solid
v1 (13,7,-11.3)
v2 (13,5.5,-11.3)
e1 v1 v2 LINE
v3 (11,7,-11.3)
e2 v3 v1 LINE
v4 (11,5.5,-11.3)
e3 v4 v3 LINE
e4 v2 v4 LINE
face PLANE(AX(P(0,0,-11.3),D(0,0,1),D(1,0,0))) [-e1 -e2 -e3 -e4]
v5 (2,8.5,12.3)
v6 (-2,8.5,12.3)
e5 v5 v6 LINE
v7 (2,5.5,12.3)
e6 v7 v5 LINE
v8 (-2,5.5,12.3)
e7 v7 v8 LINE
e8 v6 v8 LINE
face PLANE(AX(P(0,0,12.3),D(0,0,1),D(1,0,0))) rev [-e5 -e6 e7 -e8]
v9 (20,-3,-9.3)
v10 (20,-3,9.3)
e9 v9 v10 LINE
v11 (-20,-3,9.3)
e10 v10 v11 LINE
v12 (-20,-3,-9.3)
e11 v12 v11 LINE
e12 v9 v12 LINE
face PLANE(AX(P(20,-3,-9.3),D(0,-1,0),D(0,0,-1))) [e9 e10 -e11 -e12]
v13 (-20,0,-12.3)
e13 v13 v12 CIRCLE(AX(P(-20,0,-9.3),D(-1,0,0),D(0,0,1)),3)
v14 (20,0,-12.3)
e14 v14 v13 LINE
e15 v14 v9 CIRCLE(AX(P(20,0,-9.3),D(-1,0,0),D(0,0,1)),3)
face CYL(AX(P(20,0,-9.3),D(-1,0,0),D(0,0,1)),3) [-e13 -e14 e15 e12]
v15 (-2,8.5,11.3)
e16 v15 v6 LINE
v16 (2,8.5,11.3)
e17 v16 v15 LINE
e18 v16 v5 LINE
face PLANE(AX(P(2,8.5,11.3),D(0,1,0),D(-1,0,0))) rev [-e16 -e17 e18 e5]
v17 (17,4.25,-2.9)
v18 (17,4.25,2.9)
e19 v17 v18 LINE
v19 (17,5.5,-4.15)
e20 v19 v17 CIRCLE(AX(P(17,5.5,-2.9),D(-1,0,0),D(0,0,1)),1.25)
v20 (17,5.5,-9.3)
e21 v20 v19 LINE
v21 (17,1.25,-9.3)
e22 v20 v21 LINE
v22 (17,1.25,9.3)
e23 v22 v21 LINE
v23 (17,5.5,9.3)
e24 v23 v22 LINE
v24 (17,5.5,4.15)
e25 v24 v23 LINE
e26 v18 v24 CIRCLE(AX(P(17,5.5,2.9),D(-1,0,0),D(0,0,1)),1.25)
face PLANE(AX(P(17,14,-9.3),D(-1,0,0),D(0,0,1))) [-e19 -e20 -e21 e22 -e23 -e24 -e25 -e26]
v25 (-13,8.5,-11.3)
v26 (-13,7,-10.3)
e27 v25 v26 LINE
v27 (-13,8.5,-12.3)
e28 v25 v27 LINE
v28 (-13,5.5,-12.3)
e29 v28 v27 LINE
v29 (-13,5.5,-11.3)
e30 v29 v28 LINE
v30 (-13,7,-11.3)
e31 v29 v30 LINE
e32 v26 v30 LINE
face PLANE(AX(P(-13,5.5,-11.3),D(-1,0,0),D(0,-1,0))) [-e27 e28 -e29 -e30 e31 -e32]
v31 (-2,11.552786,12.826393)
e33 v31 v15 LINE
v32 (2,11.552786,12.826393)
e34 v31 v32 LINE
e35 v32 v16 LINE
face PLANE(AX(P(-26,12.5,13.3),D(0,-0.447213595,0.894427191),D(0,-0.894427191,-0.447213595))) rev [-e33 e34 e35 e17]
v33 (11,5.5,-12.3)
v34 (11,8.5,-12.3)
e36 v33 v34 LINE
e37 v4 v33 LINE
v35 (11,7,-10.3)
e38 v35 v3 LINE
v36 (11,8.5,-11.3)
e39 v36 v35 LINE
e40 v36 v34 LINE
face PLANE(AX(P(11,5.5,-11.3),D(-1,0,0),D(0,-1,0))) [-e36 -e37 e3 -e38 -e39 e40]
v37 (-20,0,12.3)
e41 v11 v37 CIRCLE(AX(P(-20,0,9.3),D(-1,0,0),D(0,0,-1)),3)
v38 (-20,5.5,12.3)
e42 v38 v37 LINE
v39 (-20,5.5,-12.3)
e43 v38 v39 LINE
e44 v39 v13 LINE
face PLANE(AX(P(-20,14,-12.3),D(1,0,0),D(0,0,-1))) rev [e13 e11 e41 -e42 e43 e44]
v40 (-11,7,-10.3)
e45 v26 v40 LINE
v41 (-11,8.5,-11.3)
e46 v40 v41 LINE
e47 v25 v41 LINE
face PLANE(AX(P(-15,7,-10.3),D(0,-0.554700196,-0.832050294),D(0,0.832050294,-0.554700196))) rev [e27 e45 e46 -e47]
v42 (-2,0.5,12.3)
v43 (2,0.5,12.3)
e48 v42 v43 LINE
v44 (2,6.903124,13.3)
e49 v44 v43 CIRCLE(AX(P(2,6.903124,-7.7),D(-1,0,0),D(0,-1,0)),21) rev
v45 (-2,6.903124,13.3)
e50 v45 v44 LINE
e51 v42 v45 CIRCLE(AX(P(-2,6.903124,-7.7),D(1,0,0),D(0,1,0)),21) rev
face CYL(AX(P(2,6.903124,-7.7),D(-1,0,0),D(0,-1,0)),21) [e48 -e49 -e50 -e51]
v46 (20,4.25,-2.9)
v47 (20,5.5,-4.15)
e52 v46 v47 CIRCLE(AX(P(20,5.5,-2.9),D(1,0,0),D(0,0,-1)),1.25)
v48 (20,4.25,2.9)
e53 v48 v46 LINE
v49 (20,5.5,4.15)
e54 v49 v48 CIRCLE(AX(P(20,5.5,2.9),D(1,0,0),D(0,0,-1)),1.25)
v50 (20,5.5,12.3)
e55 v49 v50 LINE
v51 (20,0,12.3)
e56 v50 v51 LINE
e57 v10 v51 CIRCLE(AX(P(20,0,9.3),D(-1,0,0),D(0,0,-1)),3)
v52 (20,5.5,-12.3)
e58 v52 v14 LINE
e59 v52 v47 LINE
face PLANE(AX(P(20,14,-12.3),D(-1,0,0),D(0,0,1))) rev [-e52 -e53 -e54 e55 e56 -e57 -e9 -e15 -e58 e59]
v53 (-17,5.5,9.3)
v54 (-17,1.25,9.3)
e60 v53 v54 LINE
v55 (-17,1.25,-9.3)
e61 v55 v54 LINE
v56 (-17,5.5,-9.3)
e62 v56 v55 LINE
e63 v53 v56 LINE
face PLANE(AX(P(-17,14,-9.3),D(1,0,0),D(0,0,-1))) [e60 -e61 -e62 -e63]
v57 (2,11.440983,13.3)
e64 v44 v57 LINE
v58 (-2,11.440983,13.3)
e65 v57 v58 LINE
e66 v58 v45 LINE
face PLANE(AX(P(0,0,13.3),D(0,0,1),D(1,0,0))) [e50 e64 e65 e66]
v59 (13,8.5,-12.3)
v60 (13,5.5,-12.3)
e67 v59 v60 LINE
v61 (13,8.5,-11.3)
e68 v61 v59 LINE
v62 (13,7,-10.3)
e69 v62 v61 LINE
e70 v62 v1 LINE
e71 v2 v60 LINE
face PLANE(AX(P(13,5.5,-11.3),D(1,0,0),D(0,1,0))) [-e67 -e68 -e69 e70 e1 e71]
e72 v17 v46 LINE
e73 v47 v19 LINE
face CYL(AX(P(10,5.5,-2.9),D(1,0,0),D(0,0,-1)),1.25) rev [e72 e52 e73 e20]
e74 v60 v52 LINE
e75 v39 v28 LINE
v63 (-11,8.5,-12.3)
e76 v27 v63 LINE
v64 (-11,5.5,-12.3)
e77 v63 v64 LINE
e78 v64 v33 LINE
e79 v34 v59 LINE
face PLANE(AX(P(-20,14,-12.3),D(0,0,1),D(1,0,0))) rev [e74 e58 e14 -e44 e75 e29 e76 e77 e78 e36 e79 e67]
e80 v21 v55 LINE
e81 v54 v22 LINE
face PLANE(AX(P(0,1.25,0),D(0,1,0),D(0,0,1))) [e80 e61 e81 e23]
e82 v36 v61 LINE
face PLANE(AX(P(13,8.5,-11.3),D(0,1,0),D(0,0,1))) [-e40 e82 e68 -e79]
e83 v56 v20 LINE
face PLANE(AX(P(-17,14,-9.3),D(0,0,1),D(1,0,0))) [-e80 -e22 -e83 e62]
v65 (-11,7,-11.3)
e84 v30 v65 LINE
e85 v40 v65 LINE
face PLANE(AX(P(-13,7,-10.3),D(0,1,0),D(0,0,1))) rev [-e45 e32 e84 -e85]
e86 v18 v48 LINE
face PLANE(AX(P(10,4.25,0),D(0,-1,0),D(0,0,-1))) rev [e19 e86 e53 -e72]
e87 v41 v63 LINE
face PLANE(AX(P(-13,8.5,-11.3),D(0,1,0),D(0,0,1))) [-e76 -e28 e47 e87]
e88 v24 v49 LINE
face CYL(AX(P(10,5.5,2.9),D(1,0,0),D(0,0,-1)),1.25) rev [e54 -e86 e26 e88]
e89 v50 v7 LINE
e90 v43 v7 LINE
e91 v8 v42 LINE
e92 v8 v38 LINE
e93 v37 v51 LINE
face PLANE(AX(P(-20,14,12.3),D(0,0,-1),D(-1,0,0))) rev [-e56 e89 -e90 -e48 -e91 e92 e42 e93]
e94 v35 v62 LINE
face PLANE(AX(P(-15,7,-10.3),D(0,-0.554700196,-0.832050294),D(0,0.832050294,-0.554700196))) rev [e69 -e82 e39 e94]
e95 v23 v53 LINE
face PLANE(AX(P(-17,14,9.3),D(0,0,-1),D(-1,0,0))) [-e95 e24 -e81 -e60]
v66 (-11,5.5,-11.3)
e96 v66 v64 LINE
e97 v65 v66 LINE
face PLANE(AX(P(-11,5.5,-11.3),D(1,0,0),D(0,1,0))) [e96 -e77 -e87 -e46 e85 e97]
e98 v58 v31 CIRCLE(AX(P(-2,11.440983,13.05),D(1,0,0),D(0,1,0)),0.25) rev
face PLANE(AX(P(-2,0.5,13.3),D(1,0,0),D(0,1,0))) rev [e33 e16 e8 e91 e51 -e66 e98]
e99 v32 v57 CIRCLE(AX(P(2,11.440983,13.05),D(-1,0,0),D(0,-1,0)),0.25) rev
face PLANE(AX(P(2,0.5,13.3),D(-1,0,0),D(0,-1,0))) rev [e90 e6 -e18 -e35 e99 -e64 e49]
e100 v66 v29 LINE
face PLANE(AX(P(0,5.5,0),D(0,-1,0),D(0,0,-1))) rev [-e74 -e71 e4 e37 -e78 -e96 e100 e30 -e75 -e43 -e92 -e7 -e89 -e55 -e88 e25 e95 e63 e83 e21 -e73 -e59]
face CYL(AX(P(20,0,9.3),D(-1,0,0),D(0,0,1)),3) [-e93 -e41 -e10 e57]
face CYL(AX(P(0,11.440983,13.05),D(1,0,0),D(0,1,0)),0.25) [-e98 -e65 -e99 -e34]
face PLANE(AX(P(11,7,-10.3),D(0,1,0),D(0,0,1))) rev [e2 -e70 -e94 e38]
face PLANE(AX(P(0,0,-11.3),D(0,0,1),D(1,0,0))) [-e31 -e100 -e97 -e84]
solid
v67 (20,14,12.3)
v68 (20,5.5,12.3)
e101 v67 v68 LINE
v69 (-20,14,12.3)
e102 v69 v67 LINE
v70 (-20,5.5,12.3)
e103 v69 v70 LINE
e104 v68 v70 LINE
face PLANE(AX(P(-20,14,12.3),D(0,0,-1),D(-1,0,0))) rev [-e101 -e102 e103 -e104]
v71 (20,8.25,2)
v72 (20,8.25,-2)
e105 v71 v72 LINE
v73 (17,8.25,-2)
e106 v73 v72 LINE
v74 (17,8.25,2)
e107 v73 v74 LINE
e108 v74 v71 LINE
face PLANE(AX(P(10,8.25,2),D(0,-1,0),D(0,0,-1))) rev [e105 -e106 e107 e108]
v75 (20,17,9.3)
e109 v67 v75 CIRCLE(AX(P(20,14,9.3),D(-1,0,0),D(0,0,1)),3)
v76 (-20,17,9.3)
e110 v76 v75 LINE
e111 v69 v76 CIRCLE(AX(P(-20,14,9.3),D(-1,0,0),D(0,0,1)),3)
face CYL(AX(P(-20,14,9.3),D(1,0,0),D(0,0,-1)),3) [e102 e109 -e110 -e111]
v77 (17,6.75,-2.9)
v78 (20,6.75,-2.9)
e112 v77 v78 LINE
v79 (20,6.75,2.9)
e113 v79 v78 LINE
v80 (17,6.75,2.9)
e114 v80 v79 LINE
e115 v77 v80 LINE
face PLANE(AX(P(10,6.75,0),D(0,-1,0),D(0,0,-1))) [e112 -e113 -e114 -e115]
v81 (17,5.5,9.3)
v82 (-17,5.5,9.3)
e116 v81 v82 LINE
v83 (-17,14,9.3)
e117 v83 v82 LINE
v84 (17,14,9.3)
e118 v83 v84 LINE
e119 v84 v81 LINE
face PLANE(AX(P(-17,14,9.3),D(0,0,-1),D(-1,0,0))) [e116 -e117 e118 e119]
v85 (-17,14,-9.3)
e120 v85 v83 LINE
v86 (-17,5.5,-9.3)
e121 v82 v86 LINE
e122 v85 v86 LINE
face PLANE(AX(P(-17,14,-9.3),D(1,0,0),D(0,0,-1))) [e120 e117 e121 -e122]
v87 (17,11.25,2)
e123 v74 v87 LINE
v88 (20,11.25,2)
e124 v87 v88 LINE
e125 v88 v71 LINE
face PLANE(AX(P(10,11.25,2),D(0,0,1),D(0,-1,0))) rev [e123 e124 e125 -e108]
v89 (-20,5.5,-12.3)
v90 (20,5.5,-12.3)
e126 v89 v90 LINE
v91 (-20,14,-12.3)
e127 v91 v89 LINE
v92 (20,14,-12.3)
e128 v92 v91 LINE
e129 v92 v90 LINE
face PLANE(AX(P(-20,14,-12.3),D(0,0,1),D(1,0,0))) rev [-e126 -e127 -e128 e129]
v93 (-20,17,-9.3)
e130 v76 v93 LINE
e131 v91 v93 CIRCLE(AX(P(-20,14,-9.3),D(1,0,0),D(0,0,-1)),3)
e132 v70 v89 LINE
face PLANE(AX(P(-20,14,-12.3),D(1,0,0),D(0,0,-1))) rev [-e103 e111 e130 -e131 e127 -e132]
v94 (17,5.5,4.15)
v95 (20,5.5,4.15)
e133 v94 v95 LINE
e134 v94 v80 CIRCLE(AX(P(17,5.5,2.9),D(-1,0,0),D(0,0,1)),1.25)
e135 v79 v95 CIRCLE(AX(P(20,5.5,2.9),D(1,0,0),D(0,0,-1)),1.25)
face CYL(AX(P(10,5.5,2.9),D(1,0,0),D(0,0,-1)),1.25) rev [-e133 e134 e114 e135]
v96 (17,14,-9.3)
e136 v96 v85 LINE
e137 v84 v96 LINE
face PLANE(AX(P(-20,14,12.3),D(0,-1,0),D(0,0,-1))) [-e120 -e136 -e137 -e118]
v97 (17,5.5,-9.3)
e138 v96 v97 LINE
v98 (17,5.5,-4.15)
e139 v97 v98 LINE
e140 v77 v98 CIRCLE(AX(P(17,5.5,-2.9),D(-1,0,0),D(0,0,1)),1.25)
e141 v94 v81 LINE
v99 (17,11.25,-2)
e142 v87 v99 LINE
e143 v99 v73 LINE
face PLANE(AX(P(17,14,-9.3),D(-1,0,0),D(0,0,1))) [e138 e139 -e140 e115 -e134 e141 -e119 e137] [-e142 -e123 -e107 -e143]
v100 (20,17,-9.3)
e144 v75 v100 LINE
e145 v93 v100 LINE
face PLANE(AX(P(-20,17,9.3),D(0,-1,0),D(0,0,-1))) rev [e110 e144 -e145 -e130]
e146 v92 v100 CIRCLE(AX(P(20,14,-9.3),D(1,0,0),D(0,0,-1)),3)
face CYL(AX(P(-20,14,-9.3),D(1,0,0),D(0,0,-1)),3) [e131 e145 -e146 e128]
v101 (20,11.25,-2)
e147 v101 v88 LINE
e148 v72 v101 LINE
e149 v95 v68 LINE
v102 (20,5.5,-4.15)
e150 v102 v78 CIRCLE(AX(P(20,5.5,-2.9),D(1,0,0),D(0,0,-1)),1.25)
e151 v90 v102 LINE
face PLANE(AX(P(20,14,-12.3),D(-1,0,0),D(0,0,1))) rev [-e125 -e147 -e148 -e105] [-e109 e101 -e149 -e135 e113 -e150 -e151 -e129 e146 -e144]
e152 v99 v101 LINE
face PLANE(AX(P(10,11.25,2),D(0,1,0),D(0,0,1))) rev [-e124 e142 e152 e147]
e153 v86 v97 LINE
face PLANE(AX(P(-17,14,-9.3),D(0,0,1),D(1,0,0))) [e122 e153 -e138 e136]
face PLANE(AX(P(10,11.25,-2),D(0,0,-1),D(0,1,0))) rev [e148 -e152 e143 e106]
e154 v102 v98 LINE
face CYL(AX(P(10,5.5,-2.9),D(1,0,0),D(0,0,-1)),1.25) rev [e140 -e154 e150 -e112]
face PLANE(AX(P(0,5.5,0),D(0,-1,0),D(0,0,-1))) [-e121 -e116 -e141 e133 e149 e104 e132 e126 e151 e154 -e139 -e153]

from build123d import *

# Parameters (mm, degrees)
SKETCH1_W            = 40
SKETCH1_H            = 24.6
SKETCH1_W_2          = 34
SKETCH1_H_2          = 18.6
BOSS_EXTRUDE1_DEPTH  = 14
CUT_EXTRUDE1_DEPTH   = 10
SKETCH5_W            = 4
SKETCH5_H            = 3
CUT_EXTRUDE2_DEPTH   = 10
BOSS_EXTRUDE2_DEPTH  = 40
BOSS_EXTRUDE3_DEPTH  = 40
SKETCH8_W            = 4
SKETCH8_H            = 12
BOSS_EXTRUDE4_DEPTH  = 1
FILLET4_R            = 21
SKETCH10_W           = 4
SKETCH10_H           = 2
BOSS_EXTRUDE6_DEPTH  = 1
SKETCH13_W           = 2
SKETCH13_H           = 3
BOSS_EXTRUDE7_DEPTH  = 1
SKETCH14_W           = 2
SKETCH14_H           = 1.5
BOSS_EXTRUDE9_DEPTH  = 1
SKETCH14_4_W         = 2
SKETCH14_4_H         = 1.5
BOSS_EXTRUDE10_DEPTH = 1
CUT_EXTRUDE5_DEPTH   = 28
CUT_EXTRUDE6_DEPTH   = 28
FILLET7_R            = 0.25
SKETCH18_W           = 34
SKETCH18_H           = 18.6
BOSS_EXTRUDE11_DEPTH = 1.25
CUT_EXTRUDE7_DEPTH   = 5.25


with BuildPart() as part:
    # Sketch1 → Boss-Extrude1 (new body)
    with BuildSketch(Plane(origin=(0, 0, 0), x_dir=(1, 0, 0), z_dir=(0, 1, 0))):
        Rectangle(SKETCH1_W, SKETCH1_H)
        Rectangle(SKETCH1_W_2, SKETCH1_H_2, mode=Mode.SUBTRACT)
    extrude(amount=BOSS_EXTRUDE1_DEPTH)

    # Sketch3 → Cut-Extrude1 (cut)
    with BuildSketch(Plane(origin=(20, 0, 0), x_dir=(0, 0, -1), z_dir=(1, 0, 0))):
        with BuildLine():
            ThreePointArc((2.9, 4.25), (4.15, 5.5), (2.9, 6.75))
            Line((2.9, 6.75), (-2.9, 6.75))
            ThreePointArc((-2.9, 6.75), (-4.15, 5.5), (-2.9, 4.25))
            Line((-2.9, 4.25), (2.9, 4.25))
        make_face()
    extrude(amount=-CUT_EXTRUDE1_DEPTH, mode=Mode.SUBTRACT)


with BuildPart() as body_2:
    # Split1: the piece on the far side of the plane
    add(part.part)
    split(bisect_by=Plane(origin=(0, 5.5, 0), x_dir=(0, 0, -1), z_dir=(0, -1, 0)), keep=Keep.BOTTOM)

    # Sketch5 → Cut-Extrude2 (cut)
    with BuildSketch(Plane(origin=(20, 0, 0), x_dir=(0, 0, -1), z_dir=(1, 0, 0))):
        with Locations((0, 9.75)):
            Rectangle(SKETCH5_W, SKETCH5_H)
    extrude(amount=-CUT_EXTRUDE2_DEPTH, mode=Mode.SUBTRACT)

    # Sketch6 → Boss-Extrude2 (add)
    with BuildSketch(Plane(origin=(20, 0, 0), x_dir=(0, 0, -1), z_dir=(1, 0, 0))):
        with BuildLine():
            Line((-9.3, 17), (9.3, 17))
            ThreePointArc((9.3, 17), (11.421320344, 16.121320344), (12.3, 14))
            Line((12.3, 14), (-12.3, 14))
            ThreePointArc((-12.3, 14), (-11.421320344, 16.121320344), (-9.3, 17))
        make_face()
    extrude(amount=-BOSS_EXTRUDE2_DEPTH)


with BuildPart() as part_1:
    add(part.part)

    # Split1
    split(bisect_by=Plane(origin=(0, 5.5, 0), x_dir=(0, 0, -1), z_dir=(0, -1, 0)), keep=Keep.TOP)

    # Sketch7 → Boss-Extrude3 (add)
    with BuildSketch(Plane.ZY.offset(20)):
        with BuildLine():
            Line((-9.3, -3), (9.3, -3))
            ThreePointArc((9.3, -3), (11.421320344, -2.121320344), (12.3, 0))
            Line((12.3, 0), (-12.3, 0))
            ThreePointArc((-12.3, 0), (-11.421320344, -2.121320344), (-9.3, -3))
        make_face()
    extrude(amount=-BOSS_EXTRUDE3_DEPTH)

    # Sketch8 → Boss-Extrude4 (add)
    with BuildSketch(Plane.XY.offset(12.3)):
        with Locations((0, 6.5)):
            Rectangle(SKETCH8_W, SKETCH8_H)
    extrude(amount=BOSS_EXTRUDE4_DEPTH)

    # Fillet4
    # the kernel refuses this fillet: 21 mm, written as the material it takes off along each edge
    with BuildSketch(Plane(origin=(18.007810594, 0.5, 13.3), x_dir=(0, 0, -1), z_dir=(-1, 0, 0))) as fillet4_piece_1:
        with BuildLine():
            CenterArc((21, -6.403124237), FILLET4_R, 162.247209838, 17.752790162)
            Line((0, -6.403124237), (-0.42, -6.403124237))
            Line((-0.42, -6.403124237), (-0.42, 0))
            Line((-0.42, 0), (0, 0.42))
            ThreePointArc((0, 0.42), (0.5, 0.42), (0.6, 0.128062485))
            Line((0.6, 0.128062485), (1, 0))
        make_face()
    extrude(amount=36.015621187, mode=Mode.SUBTRACT)

    # Sketch10 → Boss-Extrude6 (add)
    with BuildSketch(Plane(origin=(0, 0, 12.3), x_dir=(-1, 0, 0), z_dir=(0, 0, -1))):
        with Locations((0, 9.5)):
            Rectangle(SKETCH10_W, SKETCH10_H)
    extrude(amount=BOSS_EXTRUDE6_DEPTH)

    # Sketch13 → Boss-Extrude7 (add)
    with BuildSketch(Plane(origin=(0, 0, -12.3), x_dir=(-1, 0, 0), z_dir=(0, 0, -1))):
        with Locations((-12, 7)):
            Rectangle(SKETCH13_W, SKETCH13_H)
        with Locations((12, 7)):
            Rectangle(SKETCH13_W, SKETCH13_H)
    extrude(amount=-BOSS_EXTRUDE7_DEPTH)

    # Sketch14 → Boss-Extrude9 (add)
    with BuildSketch(Plane.XY.offset(-11.3)):
        with Locations((12, 7.75)):
            Rectangle(SKETCH14_W, SKETCH14_H)
    extrude(amount=BOSS_EXTRUDE9_DEPTH)

    # Sketch14<4> → Boss-Extrude10 (add)
    with BuildSketch(Plane.XY.offset(-11.3)):
        with Locations((-12, 7.75)):
            Rectangle(SKETCH14_4_W, SKETCH14_4_H)
        with Locations((12, 7.75)):
            Rectangle(SKETCH14_4_W, SKETCH14_4_H)
    extrude(amount=BOSS_EXTRUDE10_DEPTH)

    # Sketch15 → Cut-Extrude5 (cut)
    with BuildSketch(Plane(origin=(13, 0, 0), x_dir=(0, 0, -1), z_dir=(1, 0, 0))):
        Polygon((10.3, 7), (11.3, 8.5), (10.3, 8.5), align=None)
    extrude(amount=-CUT_EXTRUDE5_DEPTH, mode=Mode.SUBTRACT)

    # Sketch16 → Cut-Extrude6 (cut)
    with BuildSketch(Plane(origin=(2, 0, 0), x_dir=(0, 0, -1), z_dir=(1, 0, 0))):
        Polygon((-13.3, 12.5), (-12.3, 10.5), (-12.3, 12.5), align=None)
    extrude(amount=-CUT_EXTRUDE6_DEPTH, mode=Mode.SUBTRACT)

    # Fillet7
    fillet7_edges = [part_1.edges().sort_by_distance(p)[0] for p in [
        (0, 12.5, 13.3),
    ]]
    fillet(fillet7_edges, radius=FILLET7_R)

    # Sketch18 → Boss-Extrude11 (add)
    with BuildSketch(Plane(origin=(0, 0, 0), x_dir=(1, 0, 0), z_dir=(0, 1, 0))):
        Rectangle(SKETCH18_W, SKETCH18_H)
    extrude(amount=BOSS_EXTRUDE11_DEPTH)

    # Sketch19 → Cut-Extrude7 (cut)
    with BuildSketch(Plane.ZY.offset(2)):
        Polygon((12.3, 10.5), (11.3, 8.5), (11.3, 10.5), align=None)
    extrude(amount=-CUT_EXTRUDE7_DEPTH, mode=Mode.SUBTRACT)


solid = Compound([body_2.part, part_1.part])
